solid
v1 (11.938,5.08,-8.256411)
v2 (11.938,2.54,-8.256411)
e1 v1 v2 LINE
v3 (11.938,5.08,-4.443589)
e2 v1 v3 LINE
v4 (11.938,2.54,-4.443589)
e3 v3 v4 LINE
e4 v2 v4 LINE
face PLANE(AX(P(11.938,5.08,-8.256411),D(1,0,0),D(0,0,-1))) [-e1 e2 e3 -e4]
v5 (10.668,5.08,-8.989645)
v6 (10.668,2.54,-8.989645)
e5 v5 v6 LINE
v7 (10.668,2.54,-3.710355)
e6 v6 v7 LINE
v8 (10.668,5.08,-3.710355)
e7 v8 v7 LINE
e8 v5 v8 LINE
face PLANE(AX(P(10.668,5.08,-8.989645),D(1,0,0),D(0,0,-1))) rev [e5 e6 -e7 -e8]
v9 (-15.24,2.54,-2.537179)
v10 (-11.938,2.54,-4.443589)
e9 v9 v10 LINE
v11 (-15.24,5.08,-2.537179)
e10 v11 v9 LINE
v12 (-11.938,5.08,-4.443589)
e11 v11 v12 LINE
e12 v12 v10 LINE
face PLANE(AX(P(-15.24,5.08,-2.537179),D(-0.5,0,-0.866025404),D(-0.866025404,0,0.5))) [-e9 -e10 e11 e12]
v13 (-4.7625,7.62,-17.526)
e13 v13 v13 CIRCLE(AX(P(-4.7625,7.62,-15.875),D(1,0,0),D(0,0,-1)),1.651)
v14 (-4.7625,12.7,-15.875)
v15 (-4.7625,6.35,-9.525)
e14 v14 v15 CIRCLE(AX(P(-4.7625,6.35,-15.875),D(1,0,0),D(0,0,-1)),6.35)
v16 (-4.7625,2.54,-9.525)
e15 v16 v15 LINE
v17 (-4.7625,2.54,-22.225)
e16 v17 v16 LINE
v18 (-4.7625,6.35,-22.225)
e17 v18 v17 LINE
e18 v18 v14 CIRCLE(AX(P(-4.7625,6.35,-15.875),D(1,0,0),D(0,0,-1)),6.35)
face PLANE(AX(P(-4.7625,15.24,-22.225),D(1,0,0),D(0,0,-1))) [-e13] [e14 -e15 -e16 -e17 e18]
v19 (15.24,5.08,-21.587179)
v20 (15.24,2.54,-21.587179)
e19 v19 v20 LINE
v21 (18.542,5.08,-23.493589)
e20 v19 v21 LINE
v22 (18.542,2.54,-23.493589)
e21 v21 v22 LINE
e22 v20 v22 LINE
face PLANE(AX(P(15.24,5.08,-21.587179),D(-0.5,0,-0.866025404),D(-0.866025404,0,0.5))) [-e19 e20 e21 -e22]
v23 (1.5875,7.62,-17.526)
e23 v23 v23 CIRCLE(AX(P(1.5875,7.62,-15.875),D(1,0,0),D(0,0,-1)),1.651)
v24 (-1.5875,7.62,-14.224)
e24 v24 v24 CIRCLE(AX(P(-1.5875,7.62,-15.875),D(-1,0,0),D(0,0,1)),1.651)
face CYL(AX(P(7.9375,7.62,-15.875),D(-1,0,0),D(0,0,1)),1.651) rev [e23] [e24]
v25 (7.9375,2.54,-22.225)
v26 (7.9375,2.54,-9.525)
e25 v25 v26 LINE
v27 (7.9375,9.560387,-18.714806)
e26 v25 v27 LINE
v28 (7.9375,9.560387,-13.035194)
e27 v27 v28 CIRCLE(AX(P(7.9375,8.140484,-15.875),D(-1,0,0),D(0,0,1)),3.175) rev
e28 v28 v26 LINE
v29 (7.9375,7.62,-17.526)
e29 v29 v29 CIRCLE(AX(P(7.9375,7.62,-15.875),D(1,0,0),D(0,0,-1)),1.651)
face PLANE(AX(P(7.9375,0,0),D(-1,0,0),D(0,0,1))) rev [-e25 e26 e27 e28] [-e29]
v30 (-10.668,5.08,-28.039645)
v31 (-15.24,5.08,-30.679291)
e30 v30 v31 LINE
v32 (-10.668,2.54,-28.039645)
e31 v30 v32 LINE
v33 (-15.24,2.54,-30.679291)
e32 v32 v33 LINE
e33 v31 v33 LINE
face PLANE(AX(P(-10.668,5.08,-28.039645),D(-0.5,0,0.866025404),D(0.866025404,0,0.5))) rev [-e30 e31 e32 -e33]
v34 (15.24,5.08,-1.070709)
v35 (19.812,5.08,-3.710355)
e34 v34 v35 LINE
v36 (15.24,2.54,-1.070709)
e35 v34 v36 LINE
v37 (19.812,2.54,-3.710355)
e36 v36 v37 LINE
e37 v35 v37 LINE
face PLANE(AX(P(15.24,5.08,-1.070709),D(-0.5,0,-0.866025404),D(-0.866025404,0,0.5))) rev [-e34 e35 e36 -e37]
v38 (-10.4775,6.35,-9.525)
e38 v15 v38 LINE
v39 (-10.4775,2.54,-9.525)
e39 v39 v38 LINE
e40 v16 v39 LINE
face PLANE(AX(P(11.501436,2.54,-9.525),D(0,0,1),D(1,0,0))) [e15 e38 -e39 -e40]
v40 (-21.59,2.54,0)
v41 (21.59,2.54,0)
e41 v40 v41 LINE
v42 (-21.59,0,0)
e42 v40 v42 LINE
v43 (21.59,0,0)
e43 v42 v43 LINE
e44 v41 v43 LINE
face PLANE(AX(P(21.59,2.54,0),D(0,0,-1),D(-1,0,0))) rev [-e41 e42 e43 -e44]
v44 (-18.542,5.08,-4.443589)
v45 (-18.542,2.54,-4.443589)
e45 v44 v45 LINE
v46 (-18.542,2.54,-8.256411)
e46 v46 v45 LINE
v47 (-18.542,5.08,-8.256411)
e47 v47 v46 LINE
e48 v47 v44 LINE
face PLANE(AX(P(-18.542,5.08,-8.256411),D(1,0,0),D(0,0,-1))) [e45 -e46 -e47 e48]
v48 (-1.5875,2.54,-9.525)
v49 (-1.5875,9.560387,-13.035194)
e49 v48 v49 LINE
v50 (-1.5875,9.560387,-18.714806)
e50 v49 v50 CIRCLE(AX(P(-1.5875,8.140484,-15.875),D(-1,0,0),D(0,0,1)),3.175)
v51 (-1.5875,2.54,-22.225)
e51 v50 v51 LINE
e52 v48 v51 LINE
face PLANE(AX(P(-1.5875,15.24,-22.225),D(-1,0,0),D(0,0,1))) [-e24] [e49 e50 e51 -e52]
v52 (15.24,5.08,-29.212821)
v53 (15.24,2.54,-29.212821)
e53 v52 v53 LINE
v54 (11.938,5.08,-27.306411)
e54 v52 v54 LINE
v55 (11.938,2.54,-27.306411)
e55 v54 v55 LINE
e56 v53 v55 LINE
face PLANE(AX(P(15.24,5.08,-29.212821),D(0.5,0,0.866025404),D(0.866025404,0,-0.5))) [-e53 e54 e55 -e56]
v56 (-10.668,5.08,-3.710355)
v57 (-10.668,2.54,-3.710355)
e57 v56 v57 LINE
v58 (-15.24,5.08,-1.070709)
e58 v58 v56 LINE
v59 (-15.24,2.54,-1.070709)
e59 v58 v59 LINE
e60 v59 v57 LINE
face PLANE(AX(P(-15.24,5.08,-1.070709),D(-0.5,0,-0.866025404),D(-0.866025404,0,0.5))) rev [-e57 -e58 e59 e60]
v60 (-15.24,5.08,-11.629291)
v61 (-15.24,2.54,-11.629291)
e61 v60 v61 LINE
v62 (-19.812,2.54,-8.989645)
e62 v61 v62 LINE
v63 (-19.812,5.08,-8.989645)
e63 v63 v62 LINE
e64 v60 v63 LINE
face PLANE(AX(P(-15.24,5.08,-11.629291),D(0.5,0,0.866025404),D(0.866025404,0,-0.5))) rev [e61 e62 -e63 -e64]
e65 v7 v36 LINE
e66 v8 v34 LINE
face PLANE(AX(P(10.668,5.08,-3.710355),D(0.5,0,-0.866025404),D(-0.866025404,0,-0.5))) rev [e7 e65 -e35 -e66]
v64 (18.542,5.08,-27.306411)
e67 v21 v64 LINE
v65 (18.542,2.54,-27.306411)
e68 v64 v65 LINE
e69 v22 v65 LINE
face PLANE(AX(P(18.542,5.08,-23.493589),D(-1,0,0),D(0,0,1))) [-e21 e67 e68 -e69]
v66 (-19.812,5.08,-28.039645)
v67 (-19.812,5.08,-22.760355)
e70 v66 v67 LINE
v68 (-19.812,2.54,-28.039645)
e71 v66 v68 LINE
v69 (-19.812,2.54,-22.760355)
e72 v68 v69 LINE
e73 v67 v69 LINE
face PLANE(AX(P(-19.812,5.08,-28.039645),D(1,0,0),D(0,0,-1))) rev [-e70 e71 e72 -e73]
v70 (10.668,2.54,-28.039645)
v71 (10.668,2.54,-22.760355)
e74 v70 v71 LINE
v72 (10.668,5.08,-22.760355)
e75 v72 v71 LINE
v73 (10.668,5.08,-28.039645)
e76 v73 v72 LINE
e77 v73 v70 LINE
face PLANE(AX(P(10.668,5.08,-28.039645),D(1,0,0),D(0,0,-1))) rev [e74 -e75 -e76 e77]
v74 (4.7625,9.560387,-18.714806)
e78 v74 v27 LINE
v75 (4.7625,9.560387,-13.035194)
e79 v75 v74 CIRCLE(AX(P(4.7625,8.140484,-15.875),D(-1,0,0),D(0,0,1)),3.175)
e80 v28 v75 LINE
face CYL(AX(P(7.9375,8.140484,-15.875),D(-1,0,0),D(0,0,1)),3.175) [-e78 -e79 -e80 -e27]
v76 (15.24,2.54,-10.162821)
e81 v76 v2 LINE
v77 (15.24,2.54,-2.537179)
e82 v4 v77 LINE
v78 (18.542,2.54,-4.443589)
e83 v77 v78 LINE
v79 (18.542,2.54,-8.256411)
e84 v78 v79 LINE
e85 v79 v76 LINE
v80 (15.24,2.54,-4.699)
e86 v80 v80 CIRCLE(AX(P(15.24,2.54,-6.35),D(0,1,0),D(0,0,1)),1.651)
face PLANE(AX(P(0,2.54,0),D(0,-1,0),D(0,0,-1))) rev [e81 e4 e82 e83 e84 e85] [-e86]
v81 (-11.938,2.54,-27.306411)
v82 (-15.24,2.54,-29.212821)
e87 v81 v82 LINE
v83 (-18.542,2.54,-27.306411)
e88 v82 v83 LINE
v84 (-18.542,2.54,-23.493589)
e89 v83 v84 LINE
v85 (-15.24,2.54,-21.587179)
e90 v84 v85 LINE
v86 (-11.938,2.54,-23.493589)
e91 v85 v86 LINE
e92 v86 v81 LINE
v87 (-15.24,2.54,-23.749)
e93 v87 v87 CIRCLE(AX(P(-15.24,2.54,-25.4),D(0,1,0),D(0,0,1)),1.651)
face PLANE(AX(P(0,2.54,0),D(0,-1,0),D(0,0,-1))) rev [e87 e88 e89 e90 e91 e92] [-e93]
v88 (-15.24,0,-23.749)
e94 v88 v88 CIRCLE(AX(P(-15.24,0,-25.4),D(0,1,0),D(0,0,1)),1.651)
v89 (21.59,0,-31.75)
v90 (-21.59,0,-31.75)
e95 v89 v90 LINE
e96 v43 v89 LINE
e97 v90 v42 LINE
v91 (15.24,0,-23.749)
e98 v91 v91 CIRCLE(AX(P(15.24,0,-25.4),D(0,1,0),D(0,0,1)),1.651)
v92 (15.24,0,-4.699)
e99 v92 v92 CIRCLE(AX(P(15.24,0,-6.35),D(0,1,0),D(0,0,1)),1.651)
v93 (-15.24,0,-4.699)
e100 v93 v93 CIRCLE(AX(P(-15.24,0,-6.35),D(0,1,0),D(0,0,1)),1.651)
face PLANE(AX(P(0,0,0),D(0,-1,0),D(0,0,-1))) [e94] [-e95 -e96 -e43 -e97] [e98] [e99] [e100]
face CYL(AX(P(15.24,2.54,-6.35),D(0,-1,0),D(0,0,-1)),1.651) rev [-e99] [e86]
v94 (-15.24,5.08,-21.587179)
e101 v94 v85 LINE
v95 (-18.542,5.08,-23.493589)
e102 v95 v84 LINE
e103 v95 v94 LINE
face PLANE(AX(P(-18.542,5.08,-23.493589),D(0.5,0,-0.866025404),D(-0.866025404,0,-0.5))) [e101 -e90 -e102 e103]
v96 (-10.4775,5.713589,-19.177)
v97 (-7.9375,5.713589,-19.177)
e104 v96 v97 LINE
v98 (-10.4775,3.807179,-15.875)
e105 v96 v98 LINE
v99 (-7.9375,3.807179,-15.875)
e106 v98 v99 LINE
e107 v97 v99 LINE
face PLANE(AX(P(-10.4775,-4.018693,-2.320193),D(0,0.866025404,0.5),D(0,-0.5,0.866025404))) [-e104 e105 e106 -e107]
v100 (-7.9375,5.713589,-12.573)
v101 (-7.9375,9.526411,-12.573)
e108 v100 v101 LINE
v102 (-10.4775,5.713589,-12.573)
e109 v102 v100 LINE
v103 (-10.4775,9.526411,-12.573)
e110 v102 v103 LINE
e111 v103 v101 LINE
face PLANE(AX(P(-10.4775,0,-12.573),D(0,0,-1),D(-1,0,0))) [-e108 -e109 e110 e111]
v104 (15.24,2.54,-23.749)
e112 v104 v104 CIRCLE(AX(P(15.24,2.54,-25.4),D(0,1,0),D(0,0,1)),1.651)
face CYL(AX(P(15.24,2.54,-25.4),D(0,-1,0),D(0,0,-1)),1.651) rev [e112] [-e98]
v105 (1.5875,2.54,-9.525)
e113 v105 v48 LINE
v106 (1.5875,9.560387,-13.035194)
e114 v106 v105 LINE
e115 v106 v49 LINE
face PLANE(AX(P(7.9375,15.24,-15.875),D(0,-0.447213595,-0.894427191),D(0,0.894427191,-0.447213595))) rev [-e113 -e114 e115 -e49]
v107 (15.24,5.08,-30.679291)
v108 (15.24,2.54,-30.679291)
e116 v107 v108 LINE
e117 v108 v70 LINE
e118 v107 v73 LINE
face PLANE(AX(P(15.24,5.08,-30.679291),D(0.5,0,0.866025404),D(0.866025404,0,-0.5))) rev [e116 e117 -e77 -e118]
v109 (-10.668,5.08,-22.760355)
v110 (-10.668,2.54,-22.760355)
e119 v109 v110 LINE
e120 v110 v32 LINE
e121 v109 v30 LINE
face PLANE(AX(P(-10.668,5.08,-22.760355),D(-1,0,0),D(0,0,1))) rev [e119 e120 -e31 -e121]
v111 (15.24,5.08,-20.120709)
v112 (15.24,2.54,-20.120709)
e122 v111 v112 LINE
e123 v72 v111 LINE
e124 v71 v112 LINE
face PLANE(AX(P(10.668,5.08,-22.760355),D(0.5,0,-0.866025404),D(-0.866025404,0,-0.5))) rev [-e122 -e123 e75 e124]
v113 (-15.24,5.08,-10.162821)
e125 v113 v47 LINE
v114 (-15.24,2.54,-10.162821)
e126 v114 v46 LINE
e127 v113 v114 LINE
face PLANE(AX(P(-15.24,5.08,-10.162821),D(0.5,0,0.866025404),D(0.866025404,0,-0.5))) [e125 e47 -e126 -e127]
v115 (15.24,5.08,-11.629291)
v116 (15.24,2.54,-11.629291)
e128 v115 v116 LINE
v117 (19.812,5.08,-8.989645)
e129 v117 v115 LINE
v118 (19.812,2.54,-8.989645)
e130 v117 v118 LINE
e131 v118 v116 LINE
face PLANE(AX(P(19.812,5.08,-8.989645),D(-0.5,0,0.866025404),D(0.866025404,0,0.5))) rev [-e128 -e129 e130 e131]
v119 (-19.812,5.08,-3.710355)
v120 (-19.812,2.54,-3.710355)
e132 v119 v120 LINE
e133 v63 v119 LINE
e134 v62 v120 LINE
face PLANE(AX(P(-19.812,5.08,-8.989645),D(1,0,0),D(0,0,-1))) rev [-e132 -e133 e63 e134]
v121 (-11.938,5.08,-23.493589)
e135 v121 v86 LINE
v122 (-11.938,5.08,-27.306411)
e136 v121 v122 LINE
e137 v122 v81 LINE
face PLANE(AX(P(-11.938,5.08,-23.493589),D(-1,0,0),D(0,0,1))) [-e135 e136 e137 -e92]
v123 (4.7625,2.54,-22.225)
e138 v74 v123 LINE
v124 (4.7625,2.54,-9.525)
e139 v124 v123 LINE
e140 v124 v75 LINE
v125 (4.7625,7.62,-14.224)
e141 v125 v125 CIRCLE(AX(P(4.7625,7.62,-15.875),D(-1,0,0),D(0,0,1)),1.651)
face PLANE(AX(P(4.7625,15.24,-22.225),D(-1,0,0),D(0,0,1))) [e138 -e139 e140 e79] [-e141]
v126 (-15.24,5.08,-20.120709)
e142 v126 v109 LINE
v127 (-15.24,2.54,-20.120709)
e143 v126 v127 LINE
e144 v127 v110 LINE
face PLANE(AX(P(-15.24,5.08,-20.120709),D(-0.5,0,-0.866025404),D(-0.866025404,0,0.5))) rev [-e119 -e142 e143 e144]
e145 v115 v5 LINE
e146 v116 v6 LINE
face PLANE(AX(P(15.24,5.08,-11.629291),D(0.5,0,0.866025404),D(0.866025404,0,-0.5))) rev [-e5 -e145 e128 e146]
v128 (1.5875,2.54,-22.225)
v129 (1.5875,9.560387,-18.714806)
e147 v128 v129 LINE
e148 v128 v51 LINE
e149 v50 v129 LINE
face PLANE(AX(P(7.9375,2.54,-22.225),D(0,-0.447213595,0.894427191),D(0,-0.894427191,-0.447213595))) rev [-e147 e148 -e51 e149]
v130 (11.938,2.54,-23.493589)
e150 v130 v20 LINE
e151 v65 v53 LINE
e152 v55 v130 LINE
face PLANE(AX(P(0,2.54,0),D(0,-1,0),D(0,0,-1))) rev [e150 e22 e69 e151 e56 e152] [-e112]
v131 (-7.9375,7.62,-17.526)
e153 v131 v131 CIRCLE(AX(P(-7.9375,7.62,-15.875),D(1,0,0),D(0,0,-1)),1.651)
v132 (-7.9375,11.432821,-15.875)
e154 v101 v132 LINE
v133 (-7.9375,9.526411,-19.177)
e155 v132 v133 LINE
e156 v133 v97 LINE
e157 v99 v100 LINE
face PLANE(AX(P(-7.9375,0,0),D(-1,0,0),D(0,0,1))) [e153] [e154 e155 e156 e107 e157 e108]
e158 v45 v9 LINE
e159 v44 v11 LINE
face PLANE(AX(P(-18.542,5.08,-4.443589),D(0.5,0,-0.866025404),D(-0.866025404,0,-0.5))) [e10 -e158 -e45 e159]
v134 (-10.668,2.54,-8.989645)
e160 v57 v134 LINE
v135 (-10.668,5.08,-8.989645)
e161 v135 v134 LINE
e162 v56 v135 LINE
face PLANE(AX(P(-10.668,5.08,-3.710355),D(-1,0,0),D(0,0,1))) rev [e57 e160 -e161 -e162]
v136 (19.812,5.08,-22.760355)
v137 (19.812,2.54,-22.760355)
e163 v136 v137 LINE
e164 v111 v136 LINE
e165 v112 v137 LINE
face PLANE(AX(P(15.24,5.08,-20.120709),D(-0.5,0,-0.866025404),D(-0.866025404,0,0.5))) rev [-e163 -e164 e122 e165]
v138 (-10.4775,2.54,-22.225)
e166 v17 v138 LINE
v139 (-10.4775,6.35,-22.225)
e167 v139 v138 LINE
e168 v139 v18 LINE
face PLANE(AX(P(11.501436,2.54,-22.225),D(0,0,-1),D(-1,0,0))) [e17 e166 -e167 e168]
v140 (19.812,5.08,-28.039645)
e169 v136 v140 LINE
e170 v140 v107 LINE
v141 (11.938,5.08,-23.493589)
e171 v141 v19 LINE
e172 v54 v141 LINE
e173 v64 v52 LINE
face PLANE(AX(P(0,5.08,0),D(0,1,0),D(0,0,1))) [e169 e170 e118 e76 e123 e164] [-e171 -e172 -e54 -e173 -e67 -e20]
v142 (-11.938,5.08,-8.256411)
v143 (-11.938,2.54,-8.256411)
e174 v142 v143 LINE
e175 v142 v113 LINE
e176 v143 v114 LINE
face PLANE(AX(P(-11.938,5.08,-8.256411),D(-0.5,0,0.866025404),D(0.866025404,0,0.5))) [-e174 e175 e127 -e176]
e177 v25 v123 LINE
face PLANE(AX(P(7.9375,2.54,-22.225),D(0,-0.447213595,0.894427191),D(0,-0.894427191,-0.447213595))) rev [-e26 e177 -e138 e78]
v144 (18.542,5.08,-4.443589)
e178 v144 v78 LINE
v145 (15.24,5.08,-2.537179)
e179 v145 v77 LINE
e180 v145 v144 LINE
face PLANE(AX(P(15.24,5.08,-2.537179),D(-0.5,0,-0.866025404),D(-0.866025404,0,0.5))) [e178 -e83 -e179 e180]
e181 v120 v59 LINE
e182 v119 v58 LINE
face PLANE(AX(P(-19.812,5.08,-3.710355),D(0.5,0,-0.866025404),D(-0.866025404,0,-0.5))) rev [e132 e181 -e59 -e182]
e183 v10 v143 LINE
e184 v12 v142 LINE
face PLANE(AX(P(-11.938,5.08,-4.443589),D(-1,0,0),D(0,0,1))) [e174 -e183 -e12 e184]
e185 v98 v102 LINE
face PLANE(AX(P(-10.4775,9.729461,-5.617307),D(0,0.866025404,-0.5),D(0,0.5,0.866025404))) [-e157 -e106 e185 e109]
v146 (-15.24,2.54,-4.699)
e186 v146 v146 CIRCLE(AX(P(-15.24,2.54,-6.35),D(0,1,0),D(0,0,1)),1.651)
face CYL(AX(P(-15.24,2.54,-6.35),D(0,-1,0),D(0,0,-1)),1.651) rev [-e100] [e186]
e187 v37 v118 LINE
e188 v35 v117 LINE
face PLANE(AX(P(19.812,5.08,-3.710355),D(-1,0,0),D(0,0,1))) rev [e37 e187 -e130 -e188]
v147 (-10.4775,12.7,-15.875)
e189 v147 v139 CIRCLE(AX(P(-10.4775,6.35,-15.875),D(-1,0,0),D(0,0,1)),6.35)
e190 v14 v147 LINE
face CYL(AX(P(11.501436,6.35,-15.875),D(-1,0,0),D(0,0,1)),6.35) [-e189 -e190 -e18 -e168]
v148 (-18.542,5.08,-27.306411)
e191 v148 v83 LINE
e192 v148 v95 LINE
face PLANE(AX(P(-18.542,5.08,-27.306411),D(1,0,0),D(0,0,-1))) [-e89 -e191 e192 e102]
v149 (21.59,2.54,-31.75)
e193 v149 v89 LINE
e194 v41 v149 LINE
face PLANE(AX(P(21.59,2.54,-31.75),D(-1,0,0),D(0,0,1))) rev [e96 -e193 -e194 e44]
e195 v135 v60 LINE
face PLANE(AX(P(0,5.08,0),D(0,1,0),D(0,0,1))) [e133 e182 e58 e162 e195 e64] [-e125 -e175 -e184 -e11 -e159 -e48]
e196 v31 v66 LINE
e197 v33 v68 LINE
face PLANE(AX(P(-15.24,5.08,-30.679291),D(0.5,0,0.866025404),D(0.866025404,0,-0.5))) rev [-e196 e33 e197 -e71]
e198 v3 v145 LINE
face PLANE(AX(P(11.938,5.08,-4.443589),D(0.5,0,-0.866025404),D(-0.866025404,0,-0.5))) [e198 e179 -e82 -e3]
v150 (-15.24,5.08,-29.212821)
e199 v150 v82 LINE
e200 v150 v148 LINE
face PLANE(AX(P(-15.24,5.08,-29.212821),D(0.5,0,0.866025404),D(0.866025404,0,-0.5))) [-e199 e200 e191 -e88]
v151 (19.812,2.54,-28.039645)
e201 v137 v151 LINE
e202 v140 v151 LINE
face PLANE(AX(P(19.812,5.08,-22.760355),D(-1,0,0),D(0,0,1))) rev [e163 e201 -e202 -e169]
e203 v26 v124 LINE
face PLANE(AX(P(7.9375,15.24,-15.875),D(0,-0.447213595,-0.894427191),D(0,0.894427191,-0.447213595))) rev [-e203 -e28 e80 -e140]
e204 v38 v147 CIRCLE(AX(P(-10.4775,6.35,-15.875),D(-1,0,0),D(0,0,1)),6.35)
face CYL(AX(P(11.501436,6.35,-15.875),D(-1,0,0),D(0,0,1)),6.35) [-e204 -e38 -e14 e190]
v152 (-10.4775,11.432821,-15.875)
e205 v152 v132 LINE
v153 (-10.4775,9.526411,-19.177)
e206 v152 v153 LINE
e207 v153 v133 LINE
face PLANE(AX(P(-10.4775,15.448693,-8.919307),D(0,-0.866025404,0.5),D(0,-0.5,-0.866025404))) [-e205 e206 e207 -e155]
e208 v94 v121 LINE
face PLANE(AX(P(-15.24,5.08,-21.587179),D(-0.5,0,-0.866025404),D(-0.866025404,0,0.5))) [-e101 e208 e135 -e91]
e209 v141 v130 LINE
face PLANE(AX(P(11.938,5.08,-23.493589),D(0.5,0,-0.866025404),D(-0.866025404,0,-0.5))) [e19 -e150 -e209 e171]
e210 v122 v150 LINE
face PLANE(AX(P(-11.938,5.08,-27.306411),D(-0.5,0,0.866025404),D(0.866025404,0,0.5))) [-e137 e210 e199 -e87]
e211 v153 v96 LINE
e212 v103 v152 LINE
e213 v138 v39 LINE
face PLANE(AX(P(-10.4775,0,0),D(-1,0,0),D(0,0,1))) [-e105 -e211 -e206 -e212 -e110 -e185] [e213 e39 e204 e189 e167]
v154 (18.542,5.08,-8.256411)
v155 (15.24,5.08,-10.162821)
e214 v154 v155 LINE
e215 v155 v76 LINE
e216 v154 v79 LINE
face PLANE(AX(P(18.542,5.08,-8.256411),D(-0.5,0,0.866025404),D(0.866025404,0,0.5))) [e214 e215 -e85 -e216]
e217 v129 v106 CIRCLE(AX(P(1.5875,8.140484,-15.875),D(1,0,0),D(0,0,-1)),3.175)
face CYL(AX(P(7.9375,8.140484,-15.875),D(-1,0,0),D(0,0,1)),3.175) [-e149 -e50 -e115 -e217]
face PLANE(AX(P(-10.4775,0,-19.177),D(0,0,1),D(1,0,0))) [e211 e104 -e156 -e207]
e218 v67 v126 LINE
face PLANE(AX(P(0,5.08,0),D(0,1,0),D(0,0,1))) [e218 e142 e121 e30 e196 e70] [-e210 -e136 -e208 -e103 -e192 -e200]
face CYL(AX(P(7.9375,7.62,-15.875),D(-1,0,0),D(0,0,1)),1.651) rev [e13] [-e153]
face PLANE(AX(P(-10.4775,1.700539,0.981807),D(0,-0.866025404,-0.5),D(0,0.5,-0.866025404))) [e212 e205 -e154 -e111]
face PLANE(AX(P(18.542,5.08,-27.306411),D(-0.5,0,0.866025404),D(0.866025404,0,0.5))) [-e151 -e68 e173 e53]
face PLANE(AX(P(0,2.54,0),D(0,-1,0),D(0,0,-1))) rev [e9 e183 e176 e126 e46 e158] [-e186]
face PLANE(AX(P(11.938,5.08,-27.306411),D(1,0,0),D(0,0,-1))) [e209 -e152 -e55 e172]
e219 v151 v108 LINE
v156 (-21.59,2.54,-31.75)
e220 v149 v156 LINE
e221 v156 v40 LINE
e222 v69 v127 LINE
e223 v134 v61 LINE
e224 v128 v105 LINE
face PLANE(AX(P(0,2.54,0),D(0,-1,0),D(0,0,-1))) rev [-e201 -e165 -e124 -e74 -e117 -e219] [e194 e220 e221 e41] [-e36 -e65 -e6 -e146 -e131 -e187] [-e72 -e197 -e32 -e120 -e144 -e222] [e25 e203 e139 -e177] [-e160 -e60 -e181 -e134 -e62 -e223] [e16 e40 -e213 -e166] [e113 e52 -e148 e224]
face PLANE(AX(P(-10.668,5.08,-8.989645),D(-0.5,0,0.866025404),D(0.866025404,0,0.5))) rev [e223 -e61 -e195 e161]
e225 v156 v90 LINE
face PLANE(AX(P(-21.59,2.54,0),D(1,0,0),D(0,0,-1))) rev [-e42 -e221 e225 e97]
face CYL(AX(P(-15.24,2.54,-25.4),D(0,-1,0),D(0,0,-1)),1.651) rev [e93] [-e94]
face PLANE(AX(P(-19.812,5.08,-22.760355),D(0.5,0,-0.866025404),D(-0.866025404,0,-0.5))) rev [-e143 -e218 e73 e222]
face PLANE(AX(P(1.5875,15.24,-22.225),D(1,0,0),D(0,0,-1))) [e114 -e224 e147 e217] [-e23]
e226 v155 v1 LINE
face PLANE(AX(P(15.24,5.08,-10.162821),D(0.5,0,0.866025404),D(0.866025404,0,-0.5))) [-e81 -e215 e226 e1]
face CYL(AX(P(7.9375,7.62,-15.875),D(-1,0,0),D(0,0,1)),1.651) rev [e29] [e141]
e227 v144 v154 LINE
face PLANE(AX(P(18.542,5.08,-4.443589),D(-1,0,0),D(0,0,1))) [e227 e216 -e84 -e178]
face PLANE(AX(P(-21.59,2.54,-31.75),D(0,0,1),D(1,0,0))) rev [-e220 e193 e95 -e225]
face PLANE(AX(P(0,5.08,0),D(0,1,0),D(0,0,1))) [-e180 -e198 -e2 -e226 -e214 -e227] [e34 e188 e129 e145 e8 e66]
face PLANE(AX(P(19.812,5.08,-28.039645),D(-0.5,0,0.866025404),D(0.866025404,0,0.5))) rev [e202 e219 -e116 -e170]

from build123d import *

# Parameters (mm, degrees)
SKETCH1_W           = 43.18
SKETCH1_H           = 31.75
SKETCH1_R           = 1.651
BOSS_EXTRUDE1_DEPTH = 2.54
SKETCH2_R           = 1.651
BOSS_EXTRUDE2_DEPTH = 7.9375
SKETCH3_W           = 3.175
SKETCH3_H           = 12.7
CUT_EXTRUDE1_DEPTH  = 12.7
FILLET1_R           = 3.175
SKETCH6_W           = 12.7
SKETCH6_H           = 10.16
SKETCH6_R           = 1.651
BOSS_EXTRUDE5_DEPTH = 3.175
SKETCH4_W           = 12.7
SKETCH4_H           = 10.16
BOSS_EXTRUDE6_DEPTH = 2.54
FILLET2_R           = 6.35
BOSS_EXTRUDE7_DEPTH = 2.54


with BuildPart() as part:
    # Sketch1 → Boss-Extrude1 (new body)
    with BuildSketch(Plane(origin=(0, 0, 0), x_dir=(1, 0, 0), z_dir=(0, 1, 0))):
        with Locations((0, 15.875)):
            Rectangle(SKETCH1_W, SKETCH1_H)
        with Locations(Location((-15.24, 25.4, 0), (0, 0, 270))):
            Circle(SKETCH1_R, mode=Mode.SUBTRACT)
        with Locations(Location((-15.24, 6.35, 0), (0, 0, 270))):
            Circle(SKETCH1_R, mode=Mode.SUBTRACT)
        with Locations(Location((15.24, 25.4, 0), (0, 0, 270))):
            Circle(SKETCH1_R, mode=Mode.SUBTRACT)
        with Locations(Location((15.24, 6.35, 0), (0, 0, 270))):
            Circle(SKETCH1_R, mode=Mode.SUBTRACT)
    extrude(amount=BOSS_EXTRUDE1_DEPTH)

    # Sketch2 → Boss-Extrude2 (add, symmetric)
    with BuildSketch(Plane(origin=(0, 0, 0), x_dir=(0, 0, -1), z_dir=(1, 0, 0))):
        Polygon((22.225, 2.54), (15.875, 15.24), (9.525, 2.54), align=None)
        with Locations((15.875, 7.62)):
            Circle(SKETCH2_R, mode=Mode.SUBTRACT)
    extrude(amount=BOSS_EXTRUDE2_DEPTH, both=True)

    # Sketch3 → Cut-Extrude1 (cut)
    with BuildSketch(Plane(origin=(0, 2.54, 0), x_dir=(1, 0, 0), z_dir=(0, 1, 0))):
        with Locations((-3.175, 15.875)):
            Rectangle(SKETCH3_W, SKETCH3_H)
        with Locations((3.175, 15.875)):
            Rectangle(SKETCH3_W, SKETCH3_H)
    extrude(amount=CUT_EXTRUDE1_DEPTH, mode=Mode.SUBTRACT)

    # Fillet1
    fillet1_edges = [part.edges().sort_by_distance(p)[0] for p in [
        (6.35, 15.24, -15.875),
        (-6.35, 15.24, -15.875),
        (0, 15.24, -15.875),
    ]]
    fillet(fillet1_edges, radius=FILLET1_R)

    # Sketch6 → Boss-Extrude5 (add)
    with BuildSketch(Plane.ZY.offset(7.9375)):
        with Locations((-15.875, 7.62)):
            Rectangle(SKETCH6_W, SKETCH6_H)
        with Locations((-15.875, 7.62)):
            Circle(SKETCH6_R, mode=Mode.SUBTRACT)
    extrude(amount=-BOSS_EXTRUDE5_DEPTH)

    # Sketch4 → Boss-Extrude6 (add)
    with BuildSketch(Plane.ZY.offset(7.9375)):
        with Locations((-15.875, 7.62)):
            Rectangle(SKETCH4_W, SKETCH4_H)
        Polygon((-19.177, 5.713589411), (-15.875, 3.807178822), (-12.573, 5.713589411), (-12.573, 9.526410589), (-15.875, 11.432821178), (-19.177, 9.526410589), align=None, mode=Mode.SUBTRACT)
    extrude(amount=BOSS_EXTRUDE6_DEPTH)

    # Fillet2
    fillet2_edges = [part.edges().sort_by_distance(p)[0] for p in [
        (-7.62, 12.7, -9.525),
        (-7.62, 12.7, -22.225),
    ]]
    fillet(fillet2_edges, radius=FILLET2_R - 0.0001)  # a hair under: the kernel refuses the full size

    # Sketch7 → Boss-Extrude7 (add)
    # profile 1 of 4: a face of its own
    with BuildSketch(Plane(origin=(0, 2.54, 0), x_dir=(1, 0, 0), z_dir=(0, 1, 0))):
        Polygon((-15.24, 30.679290861), (-19.812, 28.039645431), (-19.812, 22.760354569), (-15.24, 20.120709139), (-10.668, 22.760354569), (-10.668, 28.039645431), align=None)
        Polygon((-15.24, 29.212821178), (-18.542, 27.306410589), (-18.542, 23.493589411), (-15.24, 21.587178822), (-11.938, 23.493589411), (-11.938, 27.306410589), align=None, mode=Mode.SUBTRACT)
    # profile 2 of 4: a face of its own
    with BuildSketch(Plane(origin=(0, 2.54, 0), x_dir=(1, 0, 0), z_dir=(0, 1, 0))):
        Polygon((15.24, 30.679290861), (10.668, 28.039645431), (10.668, 22.760354569), (15.24, 20.120709139), (19.812, 22.760354569), (19.812, 28.039645431), align=None)
        Polygon((15.24, 29.212821178), (11.938, 27.306410589), (11.938, 23.493589411), (15.24, 21.587178822), (18.542, 23.493589411), (18.542, 27.306410589), align=None, mode=Mode.SUBTRACT)
    # profile 3 of 4: a face of its own
    with BuildSketch(Plane(origin=(0, 2.54, 0), x_dir=(1, 0, 0), z_dir=(0, 1, 0))):
        Polygon((15.24, 11.629290861), (10.668, 8.989645431), (10.668, 3.710354569), (15.24, 1.070709139), (19.812, 3.710354569), (19.812, 8.989645431), align=None)
        Polygon((15.24, 10.162821178), (11.938, 8.256410589), (11.938, 4.443589411), (15.24, 2.537178822), (18.542, 4.443589411), (18.542, 8.256410589), align=None, mode=Mode.SUBTRACT)
    # profile 4 of 4: a face of its own
    with BuildSketch(Plane(origin=(0, 2.54, 0), x_dir=(1, 0, 0), z_dir=(0, 1, 0))):
        Polygon((-15.24, 11.629290861), (-19.812, 8.989645431), (-19.812, 3.710354569), (-15.24, 1.070709139), (-10.668, 3.710354569), (-10.668, 8.989645431), align=None)
        Polygon((-15.24, 10.162821178), (-18.542, 8.256410589), (-18.542, 4.443589411), (-15.24, 2.537178822), (-11.938, 4.443589411), (-11.938, 8.256410589), align=None, mode=Mode.SUBTRACT)
    extrude(amount=BOSS_EXTRUDE7_DEPTH)


solid = part.part
